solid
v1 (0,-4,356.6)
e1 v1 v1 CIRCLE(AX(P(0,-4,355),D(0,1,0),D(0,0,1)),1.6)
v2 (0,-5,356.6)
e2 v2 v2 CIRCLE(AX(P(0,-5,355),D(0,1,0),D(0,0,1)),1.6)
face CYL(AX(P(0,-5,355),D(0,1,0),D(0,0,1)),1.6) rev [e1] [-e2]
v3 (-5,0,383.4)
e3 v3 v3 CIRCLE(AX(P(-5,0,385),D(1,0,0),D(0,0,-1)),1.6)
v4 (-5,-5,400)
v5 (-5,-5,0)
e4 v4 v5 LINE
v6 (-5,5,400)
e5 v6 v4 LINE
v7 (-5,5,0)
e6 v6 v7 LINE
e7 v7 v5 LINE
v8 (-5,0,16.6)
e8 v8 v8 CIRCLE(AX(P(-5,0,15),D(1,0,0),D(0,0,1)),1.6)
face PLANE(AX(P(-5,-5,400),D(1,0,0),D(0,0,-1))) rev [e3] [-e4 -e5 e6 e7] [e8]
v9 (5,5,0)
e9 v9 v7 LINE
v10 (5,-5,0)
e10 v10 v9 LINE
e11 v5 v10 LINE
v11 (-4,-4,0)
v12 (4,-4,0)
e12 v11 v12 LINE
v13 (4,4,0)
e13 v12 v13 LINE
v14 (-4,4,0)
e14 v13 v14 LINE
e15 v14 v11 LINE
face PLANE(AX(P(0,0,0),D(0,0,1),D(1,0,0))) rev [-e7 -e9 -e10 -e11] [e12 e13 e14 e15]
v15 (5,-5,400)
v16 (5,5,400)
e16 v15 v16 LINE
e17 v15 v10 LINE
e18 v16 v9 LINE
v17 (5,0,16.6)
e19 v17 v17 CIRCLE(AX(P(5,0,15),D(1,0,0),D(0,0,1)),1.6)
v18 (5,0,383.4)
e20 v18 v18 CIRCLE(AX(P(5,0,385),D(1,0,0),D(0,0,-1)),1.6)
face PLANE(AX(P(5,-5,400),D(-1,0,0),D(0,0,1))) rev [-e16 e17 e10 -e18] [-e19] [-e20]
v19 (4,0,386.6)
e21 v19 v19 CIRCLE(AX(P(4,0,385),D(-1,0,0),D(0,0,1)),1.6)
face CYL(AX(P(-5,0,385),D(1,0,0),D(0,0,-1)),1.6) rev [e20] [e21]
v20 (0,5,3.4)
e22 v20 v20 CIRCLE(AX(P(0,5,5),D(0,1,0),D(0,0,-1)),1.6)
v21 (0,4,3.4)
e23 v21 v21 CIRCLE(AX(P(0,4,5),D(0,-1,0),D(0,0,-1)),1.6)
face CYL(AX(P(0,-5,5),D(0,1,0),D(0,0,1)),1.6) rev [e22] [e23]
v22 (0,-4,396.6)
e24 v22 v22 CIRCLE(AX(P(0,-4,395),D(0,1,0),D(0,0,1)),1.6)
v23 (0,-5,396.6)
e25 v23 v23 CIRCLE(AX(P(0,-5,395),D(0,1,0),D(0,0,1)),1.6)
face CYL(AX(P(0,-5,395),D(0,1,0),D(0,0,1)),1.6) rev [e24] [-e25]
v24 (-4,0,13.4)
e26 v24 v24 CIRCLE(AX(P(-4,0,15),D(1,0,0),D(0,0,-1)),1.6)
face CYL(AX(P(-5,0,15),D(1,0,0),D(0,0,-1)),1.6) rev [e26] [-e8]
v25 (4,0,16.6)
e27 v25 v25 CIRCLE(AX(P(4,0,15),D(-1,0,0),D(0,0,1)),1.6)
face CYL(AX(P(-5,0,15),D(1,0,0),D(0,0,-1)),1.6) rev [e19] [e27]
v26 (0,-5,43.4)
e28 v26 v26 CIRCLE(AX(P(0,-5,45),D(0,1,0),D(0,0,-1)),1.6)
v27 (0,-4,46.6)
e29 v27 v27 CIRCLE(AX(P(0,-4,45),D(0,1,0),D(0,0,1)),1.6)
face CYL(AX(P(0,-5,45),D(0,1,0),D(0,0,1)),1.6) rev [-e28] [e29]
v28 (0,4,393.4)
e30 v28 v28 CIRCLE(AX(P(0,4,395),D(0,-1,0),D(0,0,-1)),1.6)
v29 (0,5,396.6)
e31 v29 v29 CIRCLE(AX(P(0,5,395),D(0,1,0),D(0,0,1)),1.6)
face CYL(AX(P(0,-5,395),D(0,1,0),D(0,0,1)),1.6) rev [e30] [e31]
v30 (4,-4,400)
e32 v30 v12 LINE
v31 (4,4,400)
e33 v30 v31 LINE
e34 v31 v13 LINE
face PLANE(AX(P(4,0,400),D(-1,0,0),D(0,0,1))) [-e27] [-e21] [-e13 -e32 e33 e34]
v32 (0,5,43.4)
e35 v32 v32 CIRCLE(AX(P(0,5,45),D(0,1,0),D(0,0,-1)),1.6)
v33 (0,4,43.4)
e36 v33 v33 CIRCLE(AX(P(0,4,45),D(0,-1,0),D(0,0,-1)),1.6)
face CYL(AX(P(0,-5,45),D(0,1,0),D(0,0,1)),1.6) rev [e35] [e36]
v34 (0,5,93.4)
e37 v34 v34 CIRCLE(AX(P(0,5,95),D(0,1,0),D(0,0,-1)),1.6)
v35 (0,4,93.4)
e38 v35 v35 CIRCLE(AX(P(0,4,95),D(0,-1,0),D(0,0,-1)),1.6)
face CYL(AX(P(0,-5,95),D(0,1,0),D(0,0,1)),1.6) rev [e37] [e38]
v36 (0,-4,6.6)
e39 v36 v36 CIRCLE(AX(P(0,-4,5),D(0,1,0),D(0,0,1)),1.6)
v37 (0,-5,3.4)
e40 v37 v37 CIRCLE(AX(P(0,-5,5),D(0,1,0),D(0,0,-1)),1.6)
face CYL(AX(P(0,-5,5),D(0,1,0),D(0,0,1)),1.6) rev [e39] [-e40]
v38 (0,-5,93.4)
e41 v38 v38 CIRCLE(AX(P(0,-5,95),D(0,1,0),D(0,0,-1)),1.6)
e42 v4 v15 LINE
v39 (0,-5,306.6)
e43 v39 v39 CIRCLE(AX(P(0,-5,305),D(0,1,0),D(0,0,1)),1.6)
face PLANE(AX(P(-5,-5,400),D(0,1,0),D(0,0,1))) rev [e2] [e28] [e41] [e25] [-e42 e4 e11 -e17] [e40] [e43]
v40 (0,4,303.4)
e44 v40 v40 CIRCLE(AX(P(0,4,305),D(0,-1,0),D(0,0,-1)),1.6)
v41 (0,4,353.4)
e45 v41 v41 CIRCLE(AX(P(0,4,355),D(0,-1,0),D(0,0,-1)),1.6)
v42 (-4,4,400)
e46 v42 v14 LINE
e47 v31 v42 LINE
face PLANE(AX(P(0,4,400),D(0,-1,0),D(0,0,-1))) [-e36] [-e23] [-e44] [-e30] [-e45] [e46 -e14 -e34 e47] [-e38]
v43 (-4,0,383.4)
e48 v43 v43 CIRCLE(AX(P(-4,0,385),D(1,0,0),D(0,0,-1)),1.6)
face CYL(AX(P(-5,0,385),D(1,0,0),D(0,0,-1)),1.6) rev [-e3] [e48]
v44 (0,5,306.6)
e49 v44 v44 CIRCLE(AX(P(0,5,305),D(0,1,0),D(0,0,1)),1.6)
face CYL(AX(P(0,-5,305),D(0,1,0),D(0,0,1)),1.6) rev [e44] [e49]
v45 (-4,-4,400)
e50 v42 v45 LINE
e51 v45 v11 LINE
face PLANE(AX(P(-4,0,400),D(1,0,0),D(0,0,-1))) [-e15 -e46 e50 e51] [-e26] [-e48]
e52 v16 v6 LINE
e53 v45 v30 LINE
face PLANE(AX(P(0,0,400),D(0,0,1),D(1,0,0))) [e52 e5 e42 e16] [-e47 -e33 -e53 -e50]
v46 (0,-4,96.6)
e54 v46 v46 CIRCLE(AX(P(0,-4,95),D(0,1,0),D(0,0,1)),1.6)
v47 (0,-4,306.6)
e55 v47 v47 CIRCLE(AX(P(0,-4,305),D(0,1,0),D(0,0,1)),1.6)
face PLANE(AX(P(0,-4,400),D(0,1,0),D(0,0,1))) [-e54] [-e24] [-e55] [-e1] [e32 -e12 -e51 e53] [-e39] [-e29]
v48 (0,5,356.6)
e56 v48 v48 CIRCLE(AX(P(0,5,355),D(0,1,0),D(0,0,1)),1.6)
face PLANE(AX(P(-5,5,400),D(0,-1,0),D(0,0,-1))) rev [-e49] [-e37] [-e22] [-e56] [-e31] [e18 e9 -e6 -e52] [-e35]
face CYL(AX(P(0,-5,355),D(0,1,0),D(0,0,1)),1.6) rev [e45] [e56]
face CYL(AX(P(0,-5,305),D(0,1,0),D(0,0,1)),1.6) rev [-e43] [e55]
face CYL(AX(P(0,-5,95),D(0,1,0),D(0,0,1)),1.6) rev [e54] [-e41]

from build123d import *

# Parameters (mm, degrees)
EXTRUDE_1_OUTLINE_W   = 10
EXTRUDE_1_OUTLINE_H   = 10
EXTRUDE_1_OUTLINE_W_2 = 8
EXTRUDE_1_OUTLINE_H_2 = 8
EXTRUDE_1_DEPTH       = 400
SKETCH_2_R            = 1.6
CUT_EXTRUDE_1_DEPTH   = 401.156219494
SKETCH_3_R            = 1.6
CUT_EXTRUDE_2_DEPTH   = 401.156219494


# Read off the part's stored shape, not the designer's step: 押し出し-薄板1
with BuildPart() as part:
    # 押し出し-薄板1 outline → 押し出し-薄板1 (new body)
    with BuildSketch(Plane.XY):
        Rectangle(EXTRUDE_1_OUTLINE_W, EXTRUDE_1_OUTLINE_H)
        Rectangle(EXTRUDE_1_OUTLINE_W_2, EXTRUDE_1_OUTLINE_H_2, mode=Mode.SUBTRACT)
    extrude(amount=EXTRUDE_1_DEPTH)

    # ｽｹｯﾁ2 → ｶｯﾄ - 押し出し1 (cut, through all)
    with BuildSketch(Plane(origin=(0, 5, 0), x_dir=(1, 0, 0), z_dir=(0, 1, 0))):
        with Locations(Location((0, -355, 0), (0, 0, 270))):
            Circle(SKETCH_2_R)
        with Locations(Location((0, -45, 0), (0, 0, 270))):
            Circle(SKETCH_2_R)
        with Locations(Location((0, -305, 0), (0, 0, 270))):
            Circle(SKETCH_2_R)
        with Locations(Location((0, -95, 0), (0, 0, 270))):
            Circle(SKETCH_2_R)
        with Locations(Location((0, -395, 0), (0, 0, 270))):
            Circle(SKETCH_2_R)
        with Locations(Location((0, -5, 0), (0, 0, 270))):
            Circle(SKETCH_2_R)
    extrude(amount=-CUT_EXTRUDE_1_DEPTH, mode=Mode.SUBTRACT)

    # ｽｹｯﾁ3 → ｶｯﾄ - 押し出し2 (cut, through all)
    with BuildSketch(Plane(origin=(5, 0, 0), x_dir=(0, 0, -1), z_dir=(1, 0, 0))):
        with Locations((-385, 0)):
            Circle(SKETCH_3_R)
        with Locations((-15, 0)):
            Circle(SKETCH_3_R)
    extrude(amount=-CUT_EXTRUDE_2_DEPTH, mode=Mode.SUBTRACT)


solid = part.part
